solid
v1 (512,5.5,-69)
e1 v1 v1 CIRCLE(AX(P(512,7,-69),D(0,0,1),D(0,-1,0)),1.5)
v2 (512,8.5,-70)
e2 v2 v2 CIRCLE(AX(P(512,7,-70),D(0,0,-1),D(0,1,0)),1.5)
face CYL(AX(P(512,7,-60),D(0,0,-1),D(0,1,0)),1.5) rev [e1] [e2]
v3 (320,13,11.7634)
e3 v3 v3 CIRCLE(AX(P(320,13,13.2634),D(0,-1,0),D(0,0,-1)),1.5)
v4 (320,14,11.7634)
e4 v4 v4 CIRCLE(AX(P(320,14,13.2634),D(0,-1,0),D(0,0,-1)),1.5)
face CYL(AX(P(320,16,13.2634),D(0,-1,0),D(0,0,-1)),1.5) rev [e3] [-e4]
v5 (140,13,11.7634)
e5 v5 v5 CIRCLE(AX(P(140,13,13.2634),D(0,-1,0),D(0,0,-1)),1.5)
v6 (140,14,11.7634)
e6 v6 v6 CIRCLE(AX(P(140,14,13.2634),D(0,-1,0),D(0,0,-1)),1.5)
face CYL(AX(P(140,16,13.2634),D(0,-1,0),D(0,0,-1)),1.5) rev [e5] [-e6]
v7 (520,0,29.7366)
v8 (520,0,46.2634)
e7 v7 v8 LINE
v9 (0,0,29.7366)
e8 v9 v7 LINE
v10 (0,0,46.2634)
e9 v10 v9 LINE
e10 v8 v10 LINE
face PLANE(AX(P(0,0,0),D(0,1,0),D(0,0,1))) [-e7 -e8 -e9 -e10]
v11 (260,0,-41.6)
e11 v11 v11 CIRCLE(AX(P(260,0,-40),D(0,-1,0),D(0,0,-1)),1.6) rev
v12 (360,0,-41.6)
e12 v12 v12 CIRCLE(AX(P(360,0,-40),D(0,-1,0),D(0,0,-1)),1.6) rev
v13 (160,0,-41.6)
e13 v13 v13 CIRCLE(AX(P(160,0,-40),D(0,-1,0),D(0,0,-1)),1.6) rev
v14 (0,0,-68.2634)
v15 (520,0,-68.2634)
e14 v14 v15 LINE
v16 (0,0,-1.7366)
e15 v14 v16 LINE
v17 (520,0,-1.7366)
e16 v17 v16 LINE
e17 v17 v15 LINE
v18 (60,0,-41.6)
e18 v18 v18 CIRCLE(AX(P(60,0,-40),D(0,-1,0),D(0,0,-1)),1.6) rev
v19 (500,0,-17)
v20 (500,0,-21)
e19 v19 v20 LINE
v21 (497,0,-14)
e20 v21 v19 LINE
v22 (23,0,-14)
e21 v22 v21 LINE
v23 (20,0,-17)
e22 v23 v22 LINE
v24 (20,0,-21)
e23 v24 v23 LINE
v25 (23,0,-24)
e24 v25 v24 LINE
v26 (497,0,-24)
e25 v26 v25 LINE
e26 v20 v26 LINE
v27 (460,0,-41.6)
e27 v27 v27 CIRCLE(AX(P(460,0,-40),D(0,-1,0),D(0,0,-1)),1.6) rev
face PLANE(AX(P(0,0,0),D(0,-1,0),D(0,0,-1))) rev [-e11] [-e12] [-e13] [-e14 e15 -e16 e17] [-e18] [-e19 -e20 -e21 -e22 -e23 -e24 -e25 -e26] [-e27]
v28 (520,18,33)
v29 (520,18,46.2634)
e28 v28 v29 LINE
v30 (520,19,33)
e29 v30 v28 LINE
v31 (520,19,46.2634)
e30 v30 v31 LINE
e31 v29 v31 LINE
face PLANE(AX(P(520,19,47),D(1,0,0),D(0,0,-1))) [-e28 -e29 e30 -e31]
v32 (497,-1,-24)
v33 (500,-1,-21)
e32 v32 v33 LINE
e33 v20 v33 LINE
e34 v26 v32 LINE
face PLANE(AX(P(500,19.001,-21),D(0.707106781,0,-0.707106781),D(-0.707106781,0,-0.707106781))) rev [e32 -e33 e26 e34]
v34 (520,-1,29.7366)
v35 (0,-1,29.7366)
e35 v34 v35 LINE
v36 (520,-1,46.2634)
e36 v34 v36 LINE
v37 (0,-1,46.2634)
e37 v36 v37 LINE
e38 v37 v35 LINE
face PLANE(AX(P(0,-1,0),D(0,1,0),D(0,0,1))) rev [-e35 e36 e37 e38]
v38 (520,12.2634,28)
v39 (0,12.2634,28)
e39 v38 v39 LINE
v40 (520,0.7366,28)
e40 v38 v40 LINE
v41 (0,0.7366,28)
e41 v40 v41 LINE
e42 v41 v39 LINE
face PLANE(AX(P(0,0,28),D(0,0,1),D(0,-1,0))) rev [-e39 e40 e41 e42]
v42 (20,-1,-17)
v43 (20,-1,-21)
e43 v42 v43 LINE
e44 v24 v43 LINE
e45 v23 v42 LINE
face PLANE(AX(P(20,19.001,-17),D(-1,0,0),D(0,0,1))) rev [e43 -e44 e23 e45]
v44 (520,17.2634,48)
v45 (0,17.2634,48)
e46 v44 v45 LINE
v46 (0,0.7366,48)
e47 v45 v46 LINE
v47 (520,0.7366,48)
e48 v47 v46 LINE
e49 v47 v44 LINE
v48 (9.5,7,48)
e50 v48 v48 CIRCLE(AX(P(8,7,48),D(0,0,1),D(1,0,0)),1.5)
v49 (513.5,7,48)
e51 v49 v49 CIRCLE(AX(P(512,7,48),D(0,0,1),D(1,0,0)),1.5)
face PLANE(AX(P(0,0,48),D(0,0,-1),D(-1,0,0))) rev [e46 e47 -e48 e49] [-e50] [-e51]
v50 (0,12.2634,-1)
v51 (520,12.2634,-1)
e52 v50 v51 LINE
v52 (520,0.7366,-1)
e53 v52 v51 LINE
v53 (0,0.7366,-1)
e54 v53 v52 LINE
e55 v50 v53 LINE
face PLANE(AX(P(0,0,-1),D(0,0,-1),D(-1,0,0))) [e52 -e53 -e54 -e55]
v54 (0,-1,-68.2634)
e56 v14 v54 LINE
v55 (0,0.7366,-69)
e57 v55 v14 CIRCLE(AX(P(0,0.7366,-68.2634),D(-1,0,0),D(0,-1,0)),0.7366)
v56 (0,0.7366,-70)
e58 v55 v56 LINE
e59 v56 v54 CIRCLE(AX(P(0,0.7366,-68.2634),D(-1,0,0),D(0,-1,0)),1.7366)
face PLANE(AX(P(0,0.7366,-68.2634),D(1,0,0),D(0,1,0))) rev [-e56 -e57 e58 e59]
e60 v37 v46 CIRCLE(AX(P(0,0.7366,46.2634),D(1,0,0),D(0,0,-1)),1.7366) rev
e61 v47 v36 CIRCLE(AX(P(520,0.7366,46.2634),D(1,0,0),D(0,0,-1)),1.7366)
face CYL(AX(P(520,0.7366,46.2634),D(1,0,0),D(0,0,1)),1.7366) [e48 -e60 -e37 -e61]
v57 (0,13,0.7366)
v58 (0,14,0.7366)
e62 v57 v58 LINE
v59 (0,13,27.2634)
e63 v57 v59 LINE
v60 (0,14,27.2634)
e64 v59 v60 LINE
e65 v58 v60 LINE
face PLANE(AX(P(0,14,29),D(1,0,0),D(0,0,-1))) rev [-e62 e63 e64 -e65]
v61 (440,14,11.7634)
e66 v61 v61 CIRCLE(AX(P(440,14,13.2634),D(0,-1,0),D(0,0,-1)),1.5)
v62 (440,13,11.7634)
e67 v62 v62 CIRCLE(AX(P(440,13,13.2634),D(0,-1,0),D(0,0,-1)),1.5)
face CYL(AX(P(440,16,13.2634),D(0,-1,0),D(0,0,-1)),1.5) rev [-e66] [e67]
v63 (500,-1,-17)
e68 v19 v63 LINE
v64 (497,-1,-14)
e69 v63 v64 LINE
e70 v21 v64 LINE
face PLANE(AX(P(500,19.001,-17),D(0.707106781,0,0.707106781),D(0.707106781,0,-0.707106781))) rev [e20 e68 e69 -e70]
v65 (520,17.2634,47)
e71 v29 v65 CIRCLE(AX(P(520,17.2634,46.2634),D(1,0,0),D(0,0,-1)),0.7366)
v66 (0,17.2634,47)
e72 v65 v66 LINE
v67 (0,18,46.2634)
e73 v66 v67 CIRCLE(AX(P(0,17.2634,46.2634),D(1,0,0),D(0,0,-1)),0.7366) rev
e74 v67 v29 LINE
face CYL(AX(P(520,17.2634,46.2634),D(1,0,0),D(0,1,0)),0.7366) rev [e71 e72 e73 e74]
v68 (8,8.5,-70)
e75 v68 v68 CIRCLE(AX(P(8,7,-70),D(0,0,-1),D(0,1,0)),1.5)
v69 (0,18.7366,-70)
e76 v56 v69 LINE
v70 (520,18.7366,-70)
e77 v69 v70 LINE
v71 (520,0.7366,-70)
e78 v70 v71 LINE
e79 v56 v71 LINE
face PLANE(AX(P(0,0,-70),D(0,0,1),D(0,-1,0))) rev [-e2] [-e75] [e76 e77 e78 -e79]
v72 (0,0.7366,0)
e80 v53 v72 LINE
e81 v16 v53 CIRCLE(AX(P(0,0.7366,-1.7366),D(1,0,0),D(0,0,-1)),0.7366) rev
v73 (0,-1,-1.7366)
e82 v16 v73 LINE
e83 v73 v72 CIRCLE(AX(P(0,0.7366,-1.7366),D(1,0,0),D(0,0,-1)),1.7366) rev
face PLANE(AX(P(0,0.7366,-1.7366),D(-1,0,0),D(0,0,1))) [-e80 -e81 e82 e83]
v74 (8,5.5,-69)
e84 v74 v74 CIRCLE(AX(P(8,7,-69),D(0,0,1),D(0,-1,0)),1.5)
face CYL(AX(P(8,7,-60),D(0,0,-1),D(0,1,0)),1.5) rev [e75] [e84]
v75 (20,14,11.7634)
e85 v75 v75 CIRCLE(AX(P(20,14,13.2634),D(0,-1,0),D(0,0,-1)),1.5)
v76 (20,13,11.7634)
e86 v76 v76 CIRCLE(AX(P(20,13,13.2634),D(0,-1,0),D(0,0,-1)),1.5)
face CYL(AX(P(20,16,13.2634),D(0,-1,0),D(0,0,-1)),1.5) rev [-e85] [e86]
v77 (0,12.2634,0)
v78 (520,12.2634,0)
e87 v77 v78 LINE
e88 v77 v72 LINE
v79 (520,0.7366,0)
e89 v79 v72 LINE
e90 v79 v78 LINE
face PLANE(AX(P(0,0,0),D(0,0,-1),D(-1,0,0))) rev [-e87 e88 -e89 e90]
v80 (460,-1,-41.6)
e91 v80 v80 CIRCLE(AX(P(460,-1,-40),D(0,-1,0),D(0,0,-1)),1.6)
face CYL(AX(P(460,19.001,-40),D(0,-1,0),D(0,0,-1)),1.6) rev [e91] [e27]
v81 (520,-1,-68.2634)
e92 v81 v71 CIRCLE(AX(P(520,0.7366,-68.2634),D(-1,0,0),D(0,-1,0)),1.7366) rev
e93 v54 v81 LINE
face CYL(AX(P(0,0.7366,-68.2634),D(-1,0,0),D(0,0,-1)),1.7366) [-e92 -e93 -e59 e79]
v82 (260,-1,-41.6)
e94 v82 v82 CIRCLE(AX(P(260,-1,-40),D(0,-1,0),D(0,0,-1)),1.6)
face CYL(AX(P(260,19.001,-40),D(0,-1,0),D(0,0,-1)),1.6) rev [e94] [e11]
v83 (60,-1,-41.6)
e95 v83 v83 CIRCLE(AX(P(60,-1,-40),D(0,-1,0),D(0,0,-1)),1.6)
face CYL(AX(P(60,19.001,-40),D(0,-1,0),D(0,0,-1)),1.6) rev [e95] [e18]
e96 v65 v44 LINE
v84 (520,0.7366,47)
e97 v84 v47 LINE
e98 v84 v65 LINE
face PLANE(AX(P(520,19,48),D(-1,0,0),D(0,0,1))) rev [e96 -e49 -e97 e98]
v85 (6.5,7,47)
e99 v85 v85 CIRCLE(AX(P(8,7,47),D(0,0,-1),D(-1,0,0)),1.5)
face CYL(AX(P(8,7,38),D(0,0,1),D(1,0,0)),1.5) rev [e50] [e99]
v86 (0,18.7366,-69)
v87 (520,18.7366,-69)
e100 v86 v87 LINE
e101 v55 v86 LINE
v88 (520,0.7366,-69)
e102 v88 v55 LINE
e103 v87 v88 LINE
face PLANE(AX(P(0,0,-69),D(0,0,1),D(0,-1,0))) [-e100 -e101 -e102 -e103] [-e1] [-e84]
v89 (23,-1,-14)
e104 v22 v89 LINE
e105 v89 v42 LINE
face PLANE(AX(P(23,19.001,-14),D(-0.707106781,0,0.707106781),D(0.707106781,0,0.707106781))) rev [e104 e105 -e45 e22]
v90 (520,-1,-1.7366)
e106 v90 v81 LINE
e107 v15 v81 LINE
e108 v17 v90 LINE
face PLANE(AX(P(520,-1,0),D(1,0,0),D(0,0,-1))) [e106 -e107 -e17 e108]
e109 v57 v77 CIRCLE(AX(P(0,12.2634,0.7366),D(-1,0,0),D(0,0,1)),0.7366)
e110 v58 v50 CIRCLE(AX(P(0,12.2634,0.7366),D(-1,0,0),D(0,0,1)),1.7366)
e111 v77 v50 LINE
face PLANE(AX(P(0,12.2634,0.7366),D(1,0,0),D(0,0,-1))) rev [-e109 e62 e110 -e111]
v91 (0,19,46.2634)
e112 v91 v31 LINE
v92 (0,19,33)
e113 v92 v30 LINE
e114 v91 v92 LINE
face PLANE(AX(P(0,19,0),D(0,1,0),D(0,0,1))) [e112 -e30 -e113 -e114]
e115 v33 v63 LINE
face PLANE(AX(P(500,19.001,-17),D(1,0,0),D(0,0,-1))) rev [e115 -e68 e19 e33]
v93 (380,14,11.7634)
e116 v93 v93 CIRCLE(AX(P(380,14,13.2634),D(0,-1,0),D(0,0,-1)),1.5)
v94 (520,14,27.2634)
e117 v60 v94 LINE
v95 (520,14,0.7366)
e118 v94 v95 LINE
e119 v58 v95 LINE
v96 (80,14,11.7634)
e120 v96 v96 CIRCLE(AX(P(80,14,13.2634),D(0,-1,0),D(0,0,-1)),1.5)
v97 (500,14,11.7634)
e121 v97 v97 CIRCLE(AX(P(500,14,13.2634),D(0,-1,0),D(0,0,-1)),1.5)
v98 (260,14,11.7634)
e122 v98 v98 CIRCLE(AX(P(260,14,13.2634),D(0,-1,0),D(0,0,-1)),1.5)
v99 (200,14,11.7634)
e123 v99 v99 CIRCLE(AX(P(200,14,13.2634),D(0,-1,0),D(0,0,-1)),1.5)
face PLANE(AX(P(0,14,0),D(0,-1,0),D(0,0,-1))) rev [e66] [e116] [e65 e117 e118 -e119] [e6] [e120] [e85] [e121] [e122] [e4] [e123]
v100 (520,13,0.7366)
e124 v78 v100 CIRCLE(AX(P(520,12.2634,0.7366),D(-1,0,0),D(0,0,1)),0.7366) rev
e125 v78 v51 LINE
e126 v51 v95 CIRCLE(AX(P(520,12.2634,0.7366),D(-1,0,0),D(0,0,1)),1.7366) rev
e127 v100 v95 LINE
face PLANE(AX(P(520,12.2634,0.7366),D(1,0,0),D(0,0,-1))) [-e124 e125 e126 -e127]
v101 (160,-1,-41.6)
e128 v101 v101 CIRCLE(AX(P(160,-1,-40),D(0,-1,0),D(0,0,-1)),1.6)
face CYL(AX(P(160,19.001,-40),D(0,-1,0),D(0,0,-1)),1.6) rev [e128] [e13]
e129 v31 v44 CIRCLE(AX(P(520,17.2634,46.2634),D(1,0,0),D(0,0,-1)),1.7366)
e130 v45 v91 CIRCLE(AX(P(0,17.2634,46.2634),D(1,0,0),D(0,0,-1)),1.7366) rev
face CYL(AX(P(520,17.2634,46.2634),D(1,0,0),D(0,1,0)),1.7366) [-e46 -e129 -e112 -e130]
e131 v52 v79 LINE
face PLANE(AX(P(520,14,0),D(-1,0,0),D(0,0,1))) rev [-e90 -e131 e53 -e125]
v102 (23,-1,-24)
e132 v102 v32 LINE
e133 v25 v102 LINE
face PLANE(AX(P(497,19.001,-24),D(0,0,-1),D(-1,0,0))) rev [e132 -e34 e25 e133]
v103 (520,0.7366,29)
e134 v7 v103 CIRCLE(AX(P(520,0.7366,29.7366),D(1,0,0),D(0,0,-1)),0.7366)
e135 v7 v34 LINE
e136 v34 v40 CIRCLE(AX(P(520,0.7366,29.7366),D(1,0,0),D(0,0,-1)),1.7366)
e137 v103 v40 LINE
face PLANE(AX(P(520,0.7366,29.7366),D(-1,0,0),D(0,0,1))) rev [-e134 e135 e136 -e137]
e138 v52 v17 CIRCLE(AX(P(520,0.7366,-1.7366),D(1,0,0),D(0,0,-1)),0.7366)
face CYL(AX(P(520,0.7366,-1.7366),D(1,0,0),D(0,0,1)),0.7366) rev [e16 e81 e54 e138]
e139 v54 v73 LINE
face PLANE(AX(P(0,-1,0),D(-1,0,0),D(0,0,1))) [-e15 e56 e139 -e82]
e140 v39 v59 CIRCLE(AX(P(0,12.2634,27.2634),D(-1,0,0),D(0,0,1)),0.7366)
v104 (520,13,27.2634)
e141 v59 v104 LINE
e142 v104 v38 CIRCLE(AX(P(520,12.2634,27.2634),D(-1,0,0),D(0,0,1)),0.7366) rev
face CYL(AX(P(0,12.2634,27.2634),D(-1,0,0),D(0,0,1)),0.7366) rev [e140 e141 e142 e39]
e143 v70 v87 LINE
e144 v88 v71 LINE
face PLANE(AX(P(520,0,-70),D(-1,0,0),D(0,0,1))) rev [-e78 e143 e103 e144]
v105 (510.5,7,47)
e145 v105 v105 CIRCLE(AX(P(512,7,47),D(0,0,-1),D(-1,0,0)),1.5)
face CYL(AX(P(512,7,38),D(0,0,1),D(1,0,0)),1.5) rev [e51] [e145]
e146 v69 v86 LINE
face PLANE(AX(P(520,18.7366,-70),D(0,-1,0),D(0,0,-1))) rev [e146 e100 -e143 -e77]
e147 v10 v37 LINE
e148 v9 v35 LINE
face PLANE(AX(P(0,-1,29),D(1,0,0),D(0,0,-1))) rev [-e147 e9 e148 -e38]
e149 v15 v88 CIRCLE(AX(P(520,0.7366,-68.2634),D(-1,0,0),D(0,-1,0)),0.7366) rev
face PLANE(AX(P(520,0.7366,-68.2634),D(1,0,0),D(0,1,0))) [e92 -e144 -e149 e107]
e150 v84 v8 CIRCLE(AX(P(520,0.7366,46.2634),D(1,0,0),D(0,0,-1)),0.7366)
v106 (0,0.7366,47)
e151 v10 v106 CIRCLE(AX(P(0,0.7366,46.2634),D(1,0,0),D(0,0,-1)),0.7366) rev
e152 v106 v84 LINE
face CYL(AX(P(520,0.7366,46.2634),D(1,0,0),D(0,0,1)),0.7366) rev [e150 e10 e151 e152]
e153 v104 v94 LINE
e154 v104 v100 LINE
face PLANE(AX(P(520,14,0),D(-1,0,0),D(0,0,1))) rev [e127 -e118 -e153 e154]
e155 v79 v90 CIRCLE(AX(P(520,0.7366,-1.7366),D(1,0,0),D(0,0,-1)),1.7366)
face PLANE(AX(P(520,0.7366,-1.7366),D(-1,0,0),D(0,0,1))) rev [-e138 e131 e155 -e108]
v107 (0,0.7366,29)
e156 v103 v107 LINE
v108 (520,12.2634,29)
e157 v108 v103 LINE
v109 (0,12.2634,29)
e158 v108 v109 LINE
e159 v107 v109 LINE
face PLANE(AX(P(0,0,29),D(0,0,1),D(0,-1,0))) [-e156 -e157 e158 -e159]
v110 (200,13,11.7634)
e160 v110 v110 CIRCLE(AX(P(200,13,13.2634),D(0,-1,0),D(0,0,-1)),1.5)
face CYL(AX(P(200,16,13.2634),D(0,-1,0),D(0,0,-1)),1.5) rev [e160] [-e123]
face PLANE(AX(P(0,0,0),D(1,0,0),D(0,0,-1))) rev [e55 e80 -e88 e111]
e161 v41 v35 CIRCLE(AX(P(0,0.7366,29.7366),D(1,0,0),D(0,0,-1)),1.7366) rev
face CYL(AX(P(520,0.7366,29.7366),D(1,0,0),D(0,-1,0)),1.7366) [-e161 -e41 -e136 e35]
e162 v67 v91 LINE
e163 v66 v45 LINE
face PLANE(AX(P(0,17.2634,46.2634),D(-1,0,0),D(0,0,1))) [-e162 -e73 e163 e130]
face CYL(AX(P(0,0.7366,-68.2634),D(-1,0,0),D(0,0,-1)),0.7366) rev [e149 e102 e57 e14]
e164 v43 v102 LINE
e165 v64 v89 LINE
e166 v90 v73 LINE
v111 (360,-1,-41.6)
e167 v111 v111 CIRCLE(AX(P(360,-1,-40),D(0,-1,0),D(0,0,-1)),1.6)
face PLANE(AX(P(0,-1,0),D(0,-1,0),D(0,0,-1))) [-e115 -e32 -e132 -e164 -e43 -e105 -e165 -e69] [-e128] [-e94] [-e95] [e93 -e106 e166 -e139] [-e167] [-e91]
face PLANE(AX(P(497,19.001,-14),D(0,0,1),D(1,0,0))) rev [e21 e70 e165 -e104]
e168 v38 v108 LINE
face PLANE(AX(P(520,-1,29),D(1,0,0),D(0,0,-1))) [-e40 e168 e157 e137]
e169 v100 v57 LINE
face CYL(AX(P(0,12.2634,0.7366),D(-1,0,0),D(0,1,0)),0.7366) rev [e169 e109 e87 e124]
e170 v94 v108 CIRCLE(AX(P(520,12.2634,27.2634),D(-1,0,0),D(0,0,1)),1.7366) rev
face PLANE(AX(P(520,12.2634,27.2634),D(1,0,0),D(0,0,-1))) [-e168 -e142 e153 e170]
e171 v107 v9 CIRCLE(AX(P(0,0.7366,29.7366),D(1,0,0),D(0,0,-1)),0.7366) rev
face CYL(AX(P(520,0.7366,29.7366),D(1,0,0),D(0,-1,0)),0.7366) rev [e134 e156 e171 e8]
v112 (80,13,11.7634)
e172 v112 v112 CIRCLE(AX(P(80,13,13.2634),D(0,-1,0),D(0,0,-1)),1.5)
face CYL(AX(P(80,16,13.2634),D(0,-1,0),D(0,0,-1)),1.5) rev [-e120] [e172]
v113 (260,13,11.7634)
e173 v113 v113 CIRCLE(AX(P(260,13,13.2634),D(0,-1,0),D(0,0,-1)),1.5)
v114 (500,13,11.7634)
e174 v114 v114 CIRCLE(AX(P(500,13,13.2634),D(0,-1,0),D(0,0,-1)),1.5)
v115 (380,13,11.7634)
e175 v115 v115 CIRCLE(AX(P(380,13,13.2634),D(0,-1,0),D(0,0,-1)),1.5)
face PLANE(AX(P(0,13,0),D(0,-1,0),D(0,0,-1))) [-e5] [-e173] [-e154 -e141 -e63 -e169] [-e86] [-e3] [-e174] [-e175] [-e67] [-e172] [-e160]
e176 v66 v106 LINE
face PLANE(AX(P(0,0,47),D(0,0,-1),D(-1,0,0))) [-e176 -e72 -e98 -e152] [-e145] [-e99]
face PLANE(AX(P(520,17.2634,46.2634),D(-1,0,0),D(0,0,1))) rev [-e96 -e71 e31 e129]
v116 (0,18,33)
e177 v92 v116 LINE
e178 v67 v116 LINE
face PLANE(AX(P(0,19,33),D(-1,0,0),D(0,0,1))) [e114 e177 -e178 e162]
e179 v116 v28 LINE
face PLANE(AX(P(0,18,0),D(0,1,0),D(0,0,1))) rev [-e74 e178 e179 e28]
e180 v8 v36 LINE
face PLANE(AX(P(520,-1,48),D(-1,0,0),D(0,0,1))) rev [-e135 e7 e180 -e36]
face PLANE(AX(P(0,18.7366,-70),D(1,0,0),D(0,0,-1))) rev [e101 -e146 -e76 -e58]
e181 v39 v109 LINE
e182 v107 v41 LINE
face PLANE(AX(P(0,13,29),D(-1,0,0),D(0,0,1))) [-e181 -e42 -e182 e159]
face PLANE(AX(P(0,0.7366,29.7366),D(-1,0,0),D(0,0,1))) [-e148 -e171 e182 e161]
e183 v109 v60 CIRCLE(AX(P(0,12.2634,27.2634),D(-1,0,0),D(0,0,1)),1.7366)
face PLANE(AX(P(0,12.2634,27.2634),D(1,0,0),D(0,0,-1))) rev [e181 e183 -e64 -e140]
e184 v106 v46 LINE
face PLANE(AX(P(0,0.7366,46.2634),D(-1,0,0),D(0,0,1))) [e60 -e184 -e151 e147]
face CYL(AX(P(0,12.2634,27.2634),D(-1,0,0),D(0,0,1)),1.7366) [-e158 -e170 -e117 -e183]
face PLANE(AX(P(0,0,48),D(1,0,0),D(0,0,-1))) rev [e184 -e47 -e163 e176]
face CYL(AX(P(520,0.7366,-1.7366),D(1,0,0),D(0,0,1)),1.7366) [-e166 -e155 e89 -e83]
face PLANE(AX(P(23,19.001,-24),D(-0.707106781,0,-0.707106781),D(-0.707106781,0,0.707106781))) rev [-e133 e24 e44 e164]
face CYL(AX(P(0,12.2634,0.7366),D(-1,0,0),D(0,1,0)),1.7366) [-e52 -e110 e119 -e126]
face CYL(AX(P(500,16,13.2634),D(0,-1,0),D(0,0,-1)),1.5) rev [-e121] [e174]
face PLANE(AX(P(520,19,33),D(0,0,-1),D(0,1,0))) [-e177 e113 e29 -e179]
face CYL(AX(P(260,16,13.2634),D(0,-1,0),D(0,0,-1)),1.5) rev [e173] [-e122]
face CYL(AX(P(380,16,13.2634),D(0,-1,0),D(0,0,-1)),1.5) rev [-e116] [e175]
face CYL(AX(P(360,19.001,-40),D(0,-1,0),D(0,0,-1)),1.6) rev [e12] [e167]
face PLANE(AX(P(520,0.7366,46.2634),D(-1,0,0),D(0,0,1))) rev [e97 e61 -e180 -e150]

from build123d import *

# Parameters (mm, degrees)
SKETCH2_W                     = 520
SKETCH2_H                     = 70
BASE_FLANGE1_DEPTH            = 1
EDGE_FLANGE4_STRIP_W          = 5.4732
EDGE_FLANGE4_STRIP_H          = 1
EDGE_FLANGE4_STRIP_CUT_DEPTH  = 520
EDGE_FLANGE4_DEPTH            = 520
EDGE_FLANGE5_STRIP_W          = 5.4732
EDGE_FLANGE5_STRIP_H          = 1
EDGE_FLANGE5_STRIP_CUT_DEPTH  = 520
EDGE_FLANGE5_DEPTH            = 520
EDGE_FLANGE6_STRIP_W          = 5.4732
EDGE_FLANGE6_STRIP_H          = 1
EDGE_FLANGE6_STRIP_CUT_DEPTH  = 520
EDGE_FLANGE6_DEPTH            = 520
EDGE_FLANGE7_STRIP_W          = 5.4732
EDGE_FLANGE7_STRIP_H          = 1
EDGE_FLANGE7_STRIP_CUT_DEPTH  = 520
EDGE_FLANGE7_DEPTH            = 520
EDGE_FLANGE8_STRIP_W          = 5.4732
EDGE_FLANGE8_STRIP_H          = 1
EDGE_FLANGE8_STRIP_CUT_DEPTH  = 520
EDGE_FLANGE8_DEPTH            = 520
EDGE_FLANGE9_STRIP_W          = 5.4732
EDGE_FLANGE9_STRIP_H          = 1
EDGE_FLANGE9_STRIP_CUT_DEPTH  = 520
EDGE_FLANGE9_DEPTH            = 520
CUT_EXTRUDE2_REACH            = 527.071
CUT_EXTRUDE3_REACH            = 527.071
SKETCH38_R                    = 1.6
EDGE_FLANGE10_STRIP_W         = 5.4732
EDGE_FLANGE10_STRIP_H         = 1
EDGE_FLANGE10_STRIP_CUT_DEPTH = 520
EDGE_FLANGE10_DEPTH           = 520
HOLE1_START                   = 47
HOLE1_OUTLINE_R               = 1.5
HOLE1_DEPTH                   = 1
HOLE2_START                   = 47
HOLE2_OUTLINE_R               = 1.5
HOLE2_DEPTH                   = 1
HOLE3_START                   = -70
HOLE3_OUTLINE_R               = 1.5
HOLE3_DEPTH                   = 1
HOLE4_START                   = -70
HOLE4_OUTLINE_R               = 1.5
HOLE4_DEPTH                   = 1
SKETCH47_R                    = 1.5
CUT_EXTRUDE4_DEPTH            = 3


# Read off the part's stored shape, not the designer's step: Hole1, Hole2, Hole3, Hole4
# Sheet-metal steps are written as plain solids
with BuildPart() as part:
    # Sketch2 → Base-Flange1 (new body)
    with BuildSketch(Plane(origin=(0, 0, 0), x_dir=(1, 0, 0), z_dir=(0, 1, 0))):
        with Locations((260, 35)):
            Rectangle(SKETCH2_W, SKETCH2_H)
    extrude(amount=-BASE_FLANGE1_DEPTH)

    # Edge-Flange4 strip (across the edge) → Edge-Flange4 strip cut (cut)
    with BuildSketch(Plane(origin=(0, 0, 0), x_dir=(0, 0, -1), z_dir=(1, 0, 0))):
        with Locations((-1, -0.5)):
            Rectangle(EDGE_FLANGE4_STRIP_W, EDGE_FLANGE4_STRIP_H)
    extrude(amount=EDGE_FLANGE4_STRIP_CUT_DEPTH, mode=Mode.SUBTRACT)

    # Edge-Flange4 section (across the edge) → Edge-Flange4 (add)
    with BuildSketch(Plane(origin=(0, 0, 0), x_dir=(0, 0, -1), z_dir=(1, 0, 0))):
        with BuildLine():
            Line((0, 0.7366), (0, 14))
            Line((0, 14), (1, 14))
            Line((1, 14), (1, 0.7366))
            ThreePointArc((1, 0.7366), (1.215745145, 0.215745145), (1.7366, 0))
            Line((1.7366, 0), (1.7366, -1))
            ThreePointArc((1.7366, -1), (0.508638364, -0.491361636), (0, 0.7366))
        make_face()
    extrude(amount=EDGE_FLANGE4_DEPTH)

    # Edge-Flange5 strip (across the edge) → Edge-Flange5 strip cut (cut)
    with BuildSketch(Plane(origin=(520, 14, 0), x_dir=(0, -1, 0), z_dir=(-1, 0, 0))):
        with Locations((-1, -0.5)):
            Rectangle(EDGE_FLANGE5_STRIP_W, EDGE_FLANGE5_STRIP_H)
    extrude(amount=EDGE_FLANGE5_STRIP_CUT_DEPTH, mode=Mode.SUBTRACT)

    # Edge-Flange5 section (across the edge) → Edge-Flange5 (add)
    with BuildSketch(Plane(origin=(520, 14, 0), x_dir=(0, -1, 0), z_dir=(-1, 0, 0))):
        with BuildLine():
            Line((0, 0.7366), (0, 29))
            Line((0, 29), (1, 29))
            Line((1, 29), (1, 0.7366))
            ThreePointArc((1, 0.7366), (1.215745145, 0.215745145), (1.7366, 0))
            Line((1.7366, 0), (1.7366, -1))
            ThreePointArc((1.7366, -1), (0.508638364, -0.491361636), (0, 0.7366))
        make_face()
    extrude(amount=EDGE_FLANGE5_DEPTH)

    # Edge-Flange6 strip (across the edge) → Edge-Flange6 strip cut (cut)
    with BuildSketch(Plane(origin=(520, 13, 29), x_dir=(0, 0, -1), z_dir=(-1, 0, 0))):
        with Locations((-1, -0.5)):
            Rectangle(EDGE_FLANGE6_STRIP_W, EDGE_FLANGE6_STRIP_H)
    extrude(amount=EDGE_FLANGE6_STRIP_CUT_DEPTH, mode=Mode.SUBTRACT)

    # Edge-Flange6 section (across the edge) → Edge-Flange6 (add)
    with BuildSketch(Plane(origin=(520, 13, 29), x_dir=(0, 0, -1), z_dir=(-1, 0, 0))):
        with BuildLine():
            Line((0, 0.7366), (0, 14))
            Line((0, 14), (1, 14))
            Line((1, 14), (1, 0.7366))
            ThreePointArc((1, 0.7366), (1.215745145, 0.215745145), (1.7366, 0))
            Line((1.7366, 0), (1.7366, -1))
            ThreePointArc((1.7366, -1), (0.508638364, -0.491361636), (0, 0.7366))
        make_face()
    extrude(amount=EDGE_FLANGE6_DEPTH)

    # Edge-Flange7 strip (across the edge) → Edge-Flange7 strip cut (cut)
    with BuildSketch(Plane(origin=(0, -1, 29), x_dir=(0, 1, 0), z_dir=(1, 0, 0))):
        with Locations((-1, -0.5)):
            Rectangle(EDGE_FLANGE7_STRIP_W, EDGE_FLANGE7_STRIP_H)
    extrude(amount=EDGE_FLANGE7_STRIP_CUT_DEPTH, mode=Mode.SUBTRACT)

    # Edge-Flange7 section (across the edge) → Edge-Flange7 (add)
    with BuildSketch(Plane(origin=(0, -1, 29), x_dir=(0, 1, 0), z_dir=(1, 0, 0))):
        with BuildLine():
            Line((0, 0.7366), (0, 19))
            Line((0, 19), (1, 19))
            Line((1, 19), (1, 0.7366))
            ThreePointArc((1, 0.7366), (1.215745145, 0.215745145), (1.7366, 0))
            Line((1.7366, 0), (1.7366, -1))
            ThreePointArc((1.7366, -1), (0.508638364, -0.491361636), (0, 0.7366))
        make_face()
    extrude(amount=EDGE_FLANGE7_DEPTH)

    # Edge-Flange8 strip (across the edge) → Edge-Flange8 strip cut (cut)
    with BuildSketch(Plane(origin=(0, 0, 48), x_dir=(0, 0, -1), z_dir=(1, 0, 0))):
        with Locations((-1, -0.5)):
            Rectangle(EDGE_FLANGE8_STRIP_W, EDGE_FLANGE8_STRIP_H)
    extrude(amount=EDGE_FLANGE8_STRIP_CUT_DEPTH, mode=Mode.SUBTRACT)

    # Edge-Flange8 section (across the edge) → Edge-Flange8 (add)
    with BuildSketch(Plane(origin=(0, 0, 48), x_dir=(0, 0, -1), z_dir=(1, 0, 0))):
        with BuildLine():
            Line((0, 0.7366), (0, 19))
            Line((0, 19), (1, 19))
            Line((1, 19), (1, 0.7366))
            ThreePointArc((1, 0.7366), (1.215745145, 0.215745145), (1.7366, 0))
            Line((1.7366, 0), (1.7366, -1))
            ThreePointArc((1.7366, -1), (0.508638364, -0.491361636), (0, 0.7366))
        make_face()
    extrude(amount=EDGE_FLANGE8_DEPTH)

    # Edge-Flange9 strip (across the edge) → Edge-Flange9 strip cut (cut)
    with BuildSketch(Plane(origin=(0, 19, 47), x_dir=(0, -1, 0), z_dir=(1, 0, 0))):
        with Locations((-1, -0.5)):
            Rectangle(EDGE_FLANGE9_STRIP_W, EDGE_FLANGE9_STRIP_H)
    extrude(amount=EDGE_FLANGE9_STRIP_CUT_DEPTH, mode=Mode.SUBTRACT)

    # Edge-Flange9 section (across the edge) → Edge-Flange9 (add)
    with BuildSketch(Plane(origin=(0, 19, 47), x_dir=(0, -1, 0), z_dir=(1, 0, 0))):
        with BuildLine():
            Line((0, 0.7366), (0, 14))
            Line((0, 14), (1, 14))
            Line((1, 14), (1, 0.7366))
            ThreePointArc((1, 0.7366), (1.215745145, 0.215745145), (1.7366, 0))
            Line((1.7366, 0), (1.7366, -1))
            ThreePointArc((1.7366, -1), (0.508638364, -0.491361636), (0, 0.7366))
        make_face()
    extrude(amount=EDGE_FLANGE9_DEPTH)

    # Sketch37 → Cut-Extrude2 (cut, up to next)
    with BuildSketch(Plane(origin=(0, -1, 0), x_dir=(-1, 0, 0), z_dir=(0, -1, 0)), mode=Mode.PRIVATE) as cut_extrude2_sk1:
        Polygon((-497, 14), (-23, 14), (-20, 17), (-20, 21), (-23, 24), (-497, 24), (-500, 21), (-500, 17), align=None)
    cut_extrude2_tool1 = extrude(cut_extrude2_sk1.sketch, amount=-CUT_EXTRUDE2_REACH, mode=Mode.PRIVATE) & part.part
    add(cut_extrude2_tool1.solids().sort_by_distance((260, -1, -19))[0], mode=Mode.SUBTRACT)

    # Sketch38 → Cut-Extrude3 (cut, up to next)
    with BuildSketch(Plane.XZ.offset(1), mode=Mode.PRIVATE) as cut_extrude3_sk1:
        with Locations(Location((60, -40, 0), (0, 0, 270))):
            Circle(SKETCH38_R)
    cut_extrude3_tool1 = extrude(cut_extrude3_sk1.sketch, amount=-CUT_EXTRUDE3_REACH, mode=Mode.PRIVATE) & part.part
    # Sketch38 → Cut-Extrude3 (cut, up to next)
    with BuildSketch(Plane.XZ.offset(1), mode=Mode.PRIVATE) as cut_extrude3_sk2:
        with Locations(Location((160, -40, 0), (0, 0, 270))):
            Circle(SKETCH38_R)
    cut_extrude3_tool2 = extrude(cut_extrude3_sk2.sketch, amount=-CUT_EXTRUDE3_REACH, mode=Mode.PRIVATE) & part.part
    # Sketch38 → Cut-Extrude3 (cut, up to next)
    with BuildSketch(Plane.XZ.offset(1), mode=Mode.PRIVATE) as cut_extrude3_sk3:
        with Locations(Location((260, -40, 0), (0, 0, 270))):
            Circle(SKETCH38_R)
    cut_extrude3_tool3 = extrude(cut_extrude3_sk3.sketch, amount=-CUT_EXTRUDE3_REACH, mode=Mode.PRIVATE) & part.part
    # Sketch38 → Cut-Extrude3 (cut, up to next)
    with BuildSketch(Plane.XZ.offset(1), mode=Mode.PRIVATE) as cut_extrude3_sk4:
        with Locations(Location((360, -40, 0), (0, 0, 270))):
            Circle(SKETCH38_R)
    cut_extrude3_tool4 = extrude(cut_extrude3_sk4.sketch, amount=-CUT_EXTRUDE3_REACH, mode=Mode.PRIVATE) & part.part
    # Sketch38 → Cut-Extrude3 (cut, up to next)
    with BuildSketch(Plane.XZ.offset(1), mode=Mode.PRIVATE) as cut_extrude3_sk5:
        with Locations(Location((460, -40, 0), (0, 0, 270))):
            Circle(SKETCH38_R)
    cut_extrude3_tool5 = extrude(cut_extrude3_sk5.sketch, amount=-CUT_EXTRUDE3_REACH, mode=Mode.PRIVATE) & part.part
    add(cut_extrude3_tool1.solids().sort_by_distance((60, -1, -40))[0], mode=Mode.SUBTRACT)
    add(cut_extrude3_tool2.solids().sort_by_distance((160, -1, -40))[0], mode=Mode.SUBTRACT)
    add(cut_extrude3_tool3.solids().sort_by_distance((260, -1, -40))[0], mode=Mode.SUBTRACT)
    add(cut_extrude3_tool4.solids().sort_by_distance((360, -1, -40))[0], mode=Mode.SUBTRACT)
    add(cut_extrude3_tool5.solids().sort_by_distance((460, -1, -40))[0], mode=Mode.SUBTRACT)

    # Edge-Flange10 strip (across the edge) → Edge-Flange10 strip cut (cut)
    with BuildSketch(Plane(origin=(520, 0, -70), x_dir=(0, 0, 1), z_dir=(-1, 0, 0))):
        with Locations((-1, -0.5)):
            Rectangle(EDGE_FLANGE10_STRIP_W, EDGE_FLANGE10_STRIP_H)
    extrude(amount=EDGE_FLANGE10_STRIP_CUT_DEPTH, mode=Mode.SUBTRACT)

    # Edge-Flange10 section (across the edge) → Edge-Flange10 (add)
    with BuildSketch(Plane(origin=(520, 0, -70), x_dir=(0, 0, 1), z_dir=(-1, 0, 0))):
        with BuildLine():
            Line((0, 0.7366), (0, 18.7366))
            Line((0, 18.7366), (1, 18.7366))
            Line((1, 18.7366), (1, 0.7366))
            ThreePointArc((1, 0.7366), (1.215745145, 0.215745145), (1.7366, 0))
            Line((1.7366, 0), (1.7366, -1))
            ThreePointArc((1.7366, -1), (0.508638364, -0.491361636), (0, 0.7366))
        make_face()
    extrude(amount=EDGE_FLANGE10_DEPTH)

    # Hole1 outline → Hole1 (cut)
    with BuildSketch(Plane.XY.offset(HOLE1_START)):
        with Locations((8, 7)):
            Circle(HOLE1_OUTLINE_R)
    extrude(amount=HOLE1_DEPTH, mode=Mode.SUBTRACT)

    # Hole2 outline → Hole2 (cut)
    with BuildSketch(Plane.XY.offset(HOLE2_START)):
        with Locations((512, 7)):
            Circle(HOLE2_OUTLINE_R)
    extrude(amount=HOLE2_DEPTH, mode=Mode.SUBTRACT)

    # Hole3 outline → Hole3 (cut)
    with BuildSketch(Plane.XY.offset(HOLE3_START)):
        with Locations((512, 7)):
            Circle(HOLE3_OUTLINE_R)
    extrude(amount=HOLE3_DEPTH, mode=Mode.SUBTRACT)

    # Hole4 outline → Hole4 (cut)
    with BuildSketch(Plane.XY.offset(HOLE4_START)):
        with Locations((8, 7)):
            Circle(HOLE4_OUTLINE_R)
    extrude(amount=HOLE4_DEPTH, mode=Mode.SUBTRACT)

    # Sketch47 → Cut-Extrude4 (cut)
    with BuildSketch(Plane(origin=(0, 13, 0), x_dir=(-1, 0, 0), z_dir=(0, -1, 0))):
        with Locations(Location((-500, -13.2634, 0), (0, 0, 90))):
            Circle(SKETCH47_R)
        with Locations(Location((-440, -13.2634, 0), (0, 0, 90))):
            Circle(SKETCH47_R)
        with Locations(Location((-380, -13.2634, 0), (0, 0, 90))):
            Circle(SKETCH47_R)
        with Locations(Location((-320, -13.2634, 0), (0, 0, 90))):
            Circle(SKETCH47_R)
        with Locations(Location((-260, -13.2634, 0), (0, 0, 90))):
            Circle(SKETCH47_R)
        with Locations(Location((-200, -13.2634, 0), (0, 0, 90))):
            Circle(SKETCH47_R)
        with Locations(Location((-140, -13.2634, 0), (0, 0, 90))):
            Circle(SKETCH47_R)
        with Locations(Location((-80, -13.2634, 0), (0, 0, 90))):
            Circle(SKETCH47_R)
        with Locations(Location((-20, -13.2634, 0), (0, 0, 90))):
            Circle(SKETCH47_R)
    extrude(amount=-CUT_EXTRUDE4_DEPTH, mode=Mode.SUBTRACT)


solid = part.part
